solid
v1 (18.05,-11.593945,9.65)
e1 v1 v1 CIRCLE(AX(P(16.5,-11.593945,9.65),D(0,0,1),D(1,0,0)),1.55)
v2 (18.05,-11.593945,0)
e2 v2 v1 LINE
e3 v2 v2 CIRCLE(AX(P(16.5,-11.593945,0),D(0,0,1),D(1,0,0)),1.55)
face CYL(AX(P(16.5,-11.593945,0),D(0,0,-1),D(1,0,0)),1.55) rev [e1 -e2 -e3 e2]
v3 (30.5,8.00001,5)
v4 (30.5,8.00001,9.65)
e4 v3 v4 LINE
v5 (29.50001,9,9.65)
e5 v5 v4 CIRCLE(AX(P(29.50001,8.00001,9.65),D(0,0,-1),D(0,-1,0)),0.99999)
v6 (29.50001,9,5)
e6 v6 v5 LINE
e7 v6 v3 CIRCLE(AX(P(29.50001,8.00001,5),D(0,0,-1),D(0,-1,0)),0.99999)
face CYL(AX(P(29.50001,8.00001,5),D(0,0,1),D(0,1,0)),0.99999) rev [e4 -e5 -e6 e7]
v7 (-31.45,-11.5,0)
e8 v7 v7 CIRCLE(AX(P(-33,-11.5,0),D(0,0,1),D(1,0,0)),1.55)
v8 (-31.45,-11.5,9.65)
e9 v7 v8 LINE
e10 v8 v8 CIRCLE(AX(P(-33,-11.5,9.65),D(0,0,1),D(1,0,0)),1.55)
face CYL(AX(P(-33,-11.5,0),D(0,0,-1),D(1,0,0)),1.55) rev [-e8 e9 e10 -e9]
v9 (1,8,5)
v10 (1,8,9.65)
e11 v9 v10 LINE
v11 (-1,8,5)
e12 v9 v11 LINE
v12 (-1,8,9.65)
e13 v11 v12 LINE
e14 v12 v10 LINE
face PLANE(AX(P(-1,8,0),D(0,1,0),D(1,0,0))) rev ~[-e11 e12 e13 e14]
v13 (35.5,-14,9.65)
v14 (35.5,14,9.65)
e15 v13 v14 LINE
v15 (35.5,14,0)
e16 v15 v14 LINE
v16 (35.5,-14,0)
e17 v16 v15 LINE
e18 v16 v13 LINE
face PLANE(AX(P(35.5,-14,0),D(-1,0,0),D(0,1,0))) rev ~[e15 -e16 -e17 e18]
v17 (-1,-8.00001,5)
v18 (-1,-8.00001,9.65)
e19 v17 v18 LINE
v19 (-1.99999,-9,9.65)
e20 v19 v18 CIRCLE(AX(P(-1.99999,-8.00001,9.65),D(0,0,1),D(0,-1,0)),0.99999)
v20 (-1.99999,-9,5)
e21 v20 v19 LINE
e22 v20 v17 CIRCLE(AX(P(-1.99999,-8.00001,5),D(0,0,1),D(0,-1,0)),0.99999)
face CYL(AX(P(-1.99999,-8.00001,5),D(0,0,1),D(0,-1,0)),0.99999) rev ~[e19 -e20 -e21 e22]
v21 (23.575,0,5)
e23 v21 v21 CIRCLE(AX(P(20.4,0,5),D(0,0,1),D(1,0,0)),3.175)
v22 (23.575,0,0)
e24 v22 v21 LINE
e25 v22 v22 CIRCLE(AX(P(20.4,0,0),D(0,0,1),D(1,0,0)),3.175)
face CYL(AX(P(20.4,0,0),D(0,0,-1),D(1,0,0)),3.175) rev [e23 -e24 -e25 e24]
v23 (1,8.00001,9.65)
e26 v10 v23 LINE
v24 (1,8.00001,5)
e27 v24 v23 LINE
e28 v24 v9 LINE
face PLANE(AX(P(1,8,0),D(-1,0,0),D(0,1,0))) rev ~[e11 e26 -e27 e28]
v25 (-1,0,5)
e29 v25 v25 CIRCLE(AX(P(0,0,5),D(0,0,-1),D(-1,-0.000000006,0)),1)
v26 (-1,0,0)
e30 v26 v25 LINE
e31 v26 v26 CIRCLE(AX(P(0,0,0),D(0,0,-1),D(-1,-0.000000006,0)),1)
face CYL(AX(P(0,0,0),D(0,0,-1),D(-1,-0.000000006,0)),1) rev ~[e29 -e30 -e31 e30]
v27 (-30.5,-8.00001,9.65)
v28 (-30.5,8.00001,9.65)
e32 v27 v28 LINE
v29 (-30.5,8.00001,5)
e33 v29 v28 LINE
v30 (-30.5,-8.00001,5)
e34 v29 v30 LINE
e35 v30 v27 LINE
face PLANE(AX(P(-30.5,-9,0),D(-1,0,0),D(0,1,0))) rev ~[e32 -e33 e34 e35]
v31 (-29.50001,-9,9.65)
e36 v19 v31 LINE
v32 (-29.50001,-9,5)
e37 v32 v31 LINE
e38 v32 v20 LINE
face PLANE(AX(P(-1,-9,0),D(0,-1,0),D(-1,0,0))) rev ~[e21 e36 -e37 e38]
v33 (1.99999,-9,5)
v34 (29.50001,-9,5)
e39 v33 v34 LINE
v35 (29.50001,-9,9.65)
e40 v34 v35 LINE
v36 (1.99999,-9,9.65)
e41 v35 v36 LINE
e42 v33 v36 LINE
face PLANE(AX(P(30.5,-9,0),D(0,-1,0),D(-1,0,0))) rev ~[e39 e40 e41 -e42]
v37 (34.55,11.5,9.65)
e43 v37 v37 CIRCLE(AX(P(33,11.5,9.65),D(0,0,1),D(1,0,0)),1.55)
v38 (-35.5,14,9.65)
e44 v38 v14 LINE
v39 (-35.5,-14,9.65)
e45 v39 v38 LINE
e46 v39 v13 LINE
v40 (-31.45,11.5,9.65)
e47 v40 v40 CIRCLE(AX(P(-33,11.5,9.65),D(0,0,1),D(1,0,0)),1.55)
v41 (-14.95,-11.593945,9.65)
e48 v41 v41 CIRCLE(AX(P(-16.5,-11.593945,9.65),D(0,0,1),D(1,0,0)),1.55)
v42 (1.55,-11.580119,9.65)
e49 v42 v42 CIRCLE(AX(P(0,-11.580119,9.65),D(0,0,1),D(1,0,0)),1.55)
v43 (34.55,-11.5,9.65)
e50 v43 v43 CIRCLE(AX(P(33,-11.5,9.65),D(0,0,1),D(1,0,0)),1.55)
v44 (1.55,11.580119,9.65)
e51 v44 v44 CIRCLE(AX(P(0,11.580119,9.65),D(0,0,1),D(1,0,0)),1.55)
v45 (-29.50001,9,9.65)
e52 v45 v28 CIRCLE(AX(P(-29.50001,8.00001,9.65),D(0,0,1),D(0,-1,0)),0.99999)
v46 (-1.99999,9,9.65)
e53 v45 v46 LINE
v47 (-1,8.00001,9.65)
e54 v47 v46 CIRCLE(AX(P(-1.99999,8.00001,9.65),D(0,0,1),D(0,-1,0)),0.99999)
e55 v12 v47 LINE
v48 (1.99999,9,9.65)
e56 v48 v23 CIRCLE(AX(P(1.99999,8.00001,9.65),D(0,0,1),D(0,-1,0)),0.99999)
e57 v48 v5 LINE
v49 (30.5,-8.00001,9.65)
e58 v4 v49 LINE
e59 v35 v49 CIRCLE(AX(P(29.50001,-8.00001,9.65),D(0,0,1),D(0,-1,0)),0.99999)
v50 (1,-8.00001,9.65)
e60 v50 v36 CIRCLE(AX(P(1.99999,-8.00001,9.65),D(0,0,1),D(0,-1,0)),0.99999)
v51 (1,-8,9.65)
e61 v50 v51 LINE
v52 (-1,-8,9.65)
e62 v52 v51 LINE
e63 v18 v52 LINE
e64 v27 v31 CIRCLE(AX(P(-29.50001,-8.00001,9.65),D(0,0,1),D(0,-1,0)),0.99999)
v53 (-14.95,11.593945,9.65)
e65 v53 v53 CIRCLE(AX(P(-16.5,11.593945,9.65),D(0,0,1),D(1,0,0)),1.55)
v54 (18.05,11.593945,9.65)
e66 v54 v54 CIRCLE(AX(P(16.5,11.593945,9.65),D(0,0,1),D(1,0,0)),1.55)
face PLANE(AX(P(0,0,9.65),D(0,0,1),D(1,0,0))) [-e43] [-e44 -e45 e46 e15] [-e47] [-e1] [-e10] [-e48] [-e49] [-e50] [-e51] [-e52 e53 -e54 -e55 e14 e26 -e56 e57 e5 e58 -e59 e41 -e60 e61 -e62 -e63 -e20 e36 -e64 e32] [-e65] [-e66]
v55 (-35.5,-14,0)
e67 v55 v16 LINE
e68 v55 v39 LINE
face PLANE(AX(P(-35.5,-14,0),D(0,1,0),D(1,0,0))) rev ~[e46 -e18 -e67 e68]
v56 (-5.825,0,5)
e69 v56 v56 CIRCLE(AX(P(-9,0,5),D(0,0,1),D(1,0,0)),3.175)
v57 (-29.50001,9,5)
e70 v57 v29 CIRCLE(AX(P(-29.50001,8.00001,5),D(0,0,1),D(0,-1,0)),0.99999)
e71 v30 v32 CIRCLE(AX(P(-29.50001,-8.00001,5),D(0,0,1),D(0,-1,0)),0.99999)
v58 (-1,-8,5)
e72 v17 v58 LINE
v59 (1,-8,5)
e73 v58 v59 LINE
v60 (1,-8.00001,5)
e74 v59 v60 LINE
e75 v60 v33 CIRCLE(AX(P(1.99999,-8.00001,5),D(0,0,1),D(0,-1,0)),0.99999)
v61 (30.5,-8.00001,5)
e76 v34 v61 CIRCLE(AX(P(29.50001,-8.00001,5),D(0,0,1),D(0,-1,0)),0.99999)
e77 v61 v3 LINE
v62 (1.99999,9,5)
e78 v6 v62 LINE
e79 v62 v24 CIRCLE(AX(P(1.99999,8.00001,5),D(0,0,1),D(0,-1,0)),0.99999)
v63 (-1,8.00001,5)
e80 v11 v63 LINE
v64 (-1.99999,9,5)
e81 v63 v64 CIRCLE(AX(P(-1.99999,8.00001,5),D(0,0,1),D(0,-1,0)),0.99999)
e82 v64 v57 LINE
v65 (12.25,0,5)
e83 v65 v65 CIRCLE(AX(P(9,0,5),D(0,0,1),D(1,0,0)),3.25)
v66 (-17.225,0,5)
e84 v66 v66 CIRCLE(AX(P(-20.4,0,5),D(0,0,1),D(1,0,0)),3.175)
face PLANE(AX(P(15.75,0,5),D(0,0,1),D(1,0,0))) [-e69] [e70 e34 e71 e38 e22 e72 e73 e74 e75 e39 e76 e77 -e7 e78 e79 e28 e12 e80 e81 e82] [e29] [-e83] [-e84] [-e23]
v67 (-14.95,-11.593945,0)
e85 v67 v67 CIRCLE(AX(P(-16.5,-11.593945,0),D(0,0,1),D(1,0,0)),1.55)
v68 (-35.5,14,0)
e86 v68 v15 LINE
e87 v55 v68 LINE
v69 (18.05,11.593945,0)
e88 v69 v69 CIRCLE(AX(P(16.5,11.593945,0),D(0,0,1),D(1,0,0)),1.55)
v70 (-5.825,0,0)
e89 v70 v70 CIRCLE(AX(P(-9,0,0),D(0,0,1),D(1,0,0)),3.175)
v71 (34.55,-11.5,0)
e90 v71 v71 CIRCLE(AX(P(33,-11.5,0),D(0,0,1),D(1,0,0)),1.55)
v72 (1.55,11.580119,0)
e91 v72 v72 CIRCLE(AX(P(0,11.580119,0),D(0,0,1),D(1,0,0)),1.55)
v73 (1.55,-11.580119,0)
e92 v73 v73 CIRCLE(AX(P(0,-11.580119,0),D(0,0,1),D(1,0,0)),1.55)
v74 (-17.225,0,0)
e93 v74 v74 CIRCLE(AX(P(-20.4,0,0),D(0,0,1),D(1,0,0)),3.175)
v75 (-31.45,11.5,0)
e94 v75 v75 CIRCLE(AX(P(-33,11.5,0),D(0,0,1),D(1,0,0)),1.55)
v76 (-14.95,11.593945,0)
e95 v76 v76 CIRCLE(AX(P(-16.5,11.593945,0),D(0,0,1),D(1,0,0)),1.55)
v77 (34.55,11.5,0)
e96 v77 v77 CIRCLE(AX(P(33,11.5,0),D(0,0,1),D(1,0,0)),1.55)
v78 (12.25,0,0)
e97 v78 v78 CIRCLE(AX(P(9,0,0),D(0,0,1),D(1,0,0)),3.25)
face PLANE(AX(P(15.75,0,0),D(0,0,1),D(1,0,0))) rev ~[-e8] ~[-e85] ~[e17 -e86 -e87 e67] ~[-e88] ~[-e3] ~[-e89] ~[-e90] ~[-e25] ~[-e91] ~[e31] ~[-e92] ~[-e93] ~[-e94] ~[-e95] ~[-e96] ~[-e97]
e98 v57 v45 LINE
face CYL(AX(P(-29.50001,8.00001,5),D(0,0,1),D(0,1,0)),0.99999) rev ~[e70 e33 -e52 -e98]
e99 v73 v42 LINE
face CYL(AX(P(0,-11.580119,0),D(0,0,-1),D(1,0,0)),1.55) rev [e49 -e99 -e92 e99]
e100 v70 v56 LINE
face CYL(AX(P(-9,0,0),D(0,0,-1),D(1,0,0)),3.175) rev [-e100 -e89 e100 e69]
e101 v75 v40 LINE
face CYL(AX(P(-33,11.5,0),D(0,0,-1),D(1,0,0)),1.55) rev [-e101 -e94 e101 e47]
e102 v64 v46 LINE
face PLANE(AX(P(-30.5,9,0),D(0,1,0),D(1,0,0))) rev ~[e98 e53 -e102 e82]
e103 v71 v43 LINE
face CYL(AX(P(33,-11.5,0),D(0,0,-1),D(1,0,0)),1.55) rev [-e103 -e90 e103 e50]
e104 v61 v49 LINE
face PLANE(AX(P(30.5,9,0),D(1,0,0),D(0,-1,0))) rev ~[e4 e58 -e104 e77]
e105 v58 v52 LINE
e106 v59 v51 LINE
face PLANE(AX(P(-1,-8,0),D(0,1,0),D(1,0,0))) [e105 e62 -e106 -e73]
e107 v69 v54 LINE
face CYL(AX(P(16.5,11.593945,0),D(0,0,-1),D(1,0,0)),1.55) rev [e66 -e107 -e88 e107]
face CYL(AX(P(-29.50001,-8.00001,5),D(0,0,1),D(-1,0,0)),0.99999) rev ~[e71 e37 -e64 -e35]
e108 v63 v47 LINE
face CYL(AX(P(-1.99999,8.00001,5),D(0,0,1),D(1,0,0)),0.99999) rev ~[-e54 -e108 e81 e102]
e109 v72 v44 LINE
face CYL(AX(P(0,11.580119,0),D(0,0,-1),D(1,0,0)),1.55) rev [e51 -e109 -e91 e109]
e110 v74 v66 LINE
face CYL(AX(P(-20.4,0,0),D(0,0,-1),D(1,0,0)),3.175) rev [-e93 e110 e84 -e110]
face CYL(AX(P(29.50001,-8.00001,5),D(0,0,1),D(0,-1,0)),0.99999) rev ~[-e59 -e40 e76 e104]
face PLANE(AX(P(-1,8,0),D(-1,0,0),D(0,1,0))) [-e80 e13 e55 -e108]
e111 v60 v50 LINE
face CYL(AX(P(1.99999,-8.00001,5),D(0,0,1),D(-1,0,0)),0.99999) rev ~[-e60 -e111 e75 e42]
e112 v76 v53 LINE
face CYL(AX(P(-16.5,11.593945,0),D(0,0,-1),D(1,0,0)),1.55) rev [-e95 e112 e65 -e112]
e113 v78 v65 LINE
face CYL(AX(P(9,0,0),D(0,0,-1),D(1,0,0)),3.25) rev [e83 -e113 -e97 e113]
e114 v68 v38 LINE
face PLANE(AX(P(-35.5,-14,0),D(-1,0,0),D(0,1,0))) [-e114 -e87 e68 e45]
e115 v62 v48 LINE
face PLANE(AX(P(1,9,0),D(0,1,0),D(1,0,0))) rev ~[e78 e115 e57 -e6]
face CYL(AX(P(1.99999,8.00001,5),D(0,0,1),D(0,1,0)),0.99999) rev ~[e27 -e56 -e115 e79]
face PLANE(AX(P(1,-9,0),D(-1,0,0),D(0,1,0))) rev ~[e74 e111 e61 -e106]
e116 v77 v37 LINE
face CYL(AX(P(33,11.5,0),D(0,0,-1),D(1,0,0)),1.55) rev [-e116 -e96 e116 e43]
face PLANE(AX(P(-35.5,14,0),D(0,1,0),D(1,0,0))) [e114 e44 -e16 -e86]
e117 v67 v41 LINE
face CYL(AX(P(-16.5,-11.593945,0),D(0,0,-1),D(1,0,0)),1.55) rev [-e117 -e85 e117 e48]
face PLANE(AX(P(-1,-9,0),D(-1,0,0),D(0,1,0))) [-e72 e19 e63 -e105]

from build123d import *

# Parameters (mm, degrees)
F0_W     = 71
F0_H     = 28
F0_R     = 1.55
F0_W_2   = 2
F0_H_2   = 1
F1_DEPTH = 9.65
F0_R_2   = 3.25
F0_R_3   = 3.175
F2_DEPTH = 5
F3_R     = 0.99999


# Not quite as in the source:
# - a fillet or chamfer is up to 0.001 mm smaller than in the source, because OpenCascade refuses the exact size


with BuildPart() as f1:
    # F0 (on Top) → F1 (new body)
    with BuildSketch(Plane.XY):
        Rectangle(F0_W, F0_H)
        with Locations((-33, -11.5)):
            Circle(F0_R, mode=Mode.SUBTRACT)
        with Locations((-16.5, -11.5939453244)):
            Circle(F0_R, mode=Mode.SUBTRACT)
        with Locations((0, -11.5801189095)):
            Circle(F0_R, mode=Mode.SUBTRACT)
        with Locations((16.5, -11.5939453244)):
            Circle(F0_R, mode=Mode.SUBTRACT)
        with Locations((33, -11.5)):
            Circle(F0_R, mode=Mode.SUBTRACT)
        with Locations((-33, 11.5)):
            Circle(F0_R, mode=Mode.SUBTRACT)
        with Locations((-16.5, 11.5939453244)):
            Circle(F0_R, mode=Mode.SUBTRACT)
        Polygon((-30.5, -9), (-30.5, 9), (-1, 9), (1, 9), (30.5, 9), (30.5, -9), (1, -9), (-1, -9), align=None, mode=Mode.SUBTRACT)
        with Locations((0, 11.5801189095)):
            Circle(F0_R, mode=Mode.SUBTRACT)
        with Locations((16.5, 11.5939453244)):
            Circle(F0_R, mode=Mode.SUBTRACT)
        with Locations((33, 11.5)):
            Circle(F0_R, mode=Mode.SUBTRACT)
        with Locations((0, -8.5)):
            Rectangle(F0_W_2, F0_H_2)
        with Locations((0, 8.5)):
            Rectangle(F0_W_2, F0_H_2)
    extrude(amount=F1_DEPTH)

    # F0 (on Top) → F2 (join)
    with BuildSketch(Plane.XY):
        Polygon((30.5, 9), (1, 9), (1, 8), (1, 0), (1, -8), (1, -9), (30.5, -9), align=None)
        with Locations((9, 0)):
            Circle(F0_R_2, mode=Mode.SUBTRACT)
        with Locations((20.4, 0)):
            Circle(F0_R_3, mode=Mode.SUBTRACT)
        Polygon((-1, 9), (-30.5, 9), (-30.5, -9), (-1, -9), (-1, -8), (-1, -6.4e-09), (-1, 8), align=None)
        with Locations((-20.4, 0)):
            Circle(F0_R_3, mode=Mode.SUBTRACT)
        with Locations((-9, 0)):
            Circle(F0_R_3, mode=Mode.SUBTRACT)
        with BuildLine():
            ThreePointArc((1, 0), (3.2e-09, -1), (-1, -6.4e-09))
            Line((-1, -6.4e-09), (-1, -8))
            Line((-1, -8), (1, -8))
            Line((1, -8), (1, 0))
        make_face()
        with BuildLine():
            Line((1, 8), (-1, 8))
            Line((-1, 8), (-1, -6.4e-09))
            ThreePointArc((-1, -6.4e-09), (-3.2e-09, 1), (1, 0))
            Line((1, 0), (1, 8))
        make_face()
    extrude(amount=F2_DEPTH)

    # F3 (radius 1 in the source; OpenCascade refuses exactly that, so slightly less here)
    f3_edges = [f1.edges().sort_by_distance(p)[0] for p in [
        (-30.5, -9, 7.325),
        (-1, -9, 7.325),
        (-30.5, 9, 7.325),
        (-1, 9, 7.325),
        (1, 9, 7.325),
        (1, -9, 7.325),
        (30.5, -9, 7.325),
        (30.5, 9, 7.325),
    ]]
    fillet(f3_edges, radius=F3_R)


solid = f1.part
